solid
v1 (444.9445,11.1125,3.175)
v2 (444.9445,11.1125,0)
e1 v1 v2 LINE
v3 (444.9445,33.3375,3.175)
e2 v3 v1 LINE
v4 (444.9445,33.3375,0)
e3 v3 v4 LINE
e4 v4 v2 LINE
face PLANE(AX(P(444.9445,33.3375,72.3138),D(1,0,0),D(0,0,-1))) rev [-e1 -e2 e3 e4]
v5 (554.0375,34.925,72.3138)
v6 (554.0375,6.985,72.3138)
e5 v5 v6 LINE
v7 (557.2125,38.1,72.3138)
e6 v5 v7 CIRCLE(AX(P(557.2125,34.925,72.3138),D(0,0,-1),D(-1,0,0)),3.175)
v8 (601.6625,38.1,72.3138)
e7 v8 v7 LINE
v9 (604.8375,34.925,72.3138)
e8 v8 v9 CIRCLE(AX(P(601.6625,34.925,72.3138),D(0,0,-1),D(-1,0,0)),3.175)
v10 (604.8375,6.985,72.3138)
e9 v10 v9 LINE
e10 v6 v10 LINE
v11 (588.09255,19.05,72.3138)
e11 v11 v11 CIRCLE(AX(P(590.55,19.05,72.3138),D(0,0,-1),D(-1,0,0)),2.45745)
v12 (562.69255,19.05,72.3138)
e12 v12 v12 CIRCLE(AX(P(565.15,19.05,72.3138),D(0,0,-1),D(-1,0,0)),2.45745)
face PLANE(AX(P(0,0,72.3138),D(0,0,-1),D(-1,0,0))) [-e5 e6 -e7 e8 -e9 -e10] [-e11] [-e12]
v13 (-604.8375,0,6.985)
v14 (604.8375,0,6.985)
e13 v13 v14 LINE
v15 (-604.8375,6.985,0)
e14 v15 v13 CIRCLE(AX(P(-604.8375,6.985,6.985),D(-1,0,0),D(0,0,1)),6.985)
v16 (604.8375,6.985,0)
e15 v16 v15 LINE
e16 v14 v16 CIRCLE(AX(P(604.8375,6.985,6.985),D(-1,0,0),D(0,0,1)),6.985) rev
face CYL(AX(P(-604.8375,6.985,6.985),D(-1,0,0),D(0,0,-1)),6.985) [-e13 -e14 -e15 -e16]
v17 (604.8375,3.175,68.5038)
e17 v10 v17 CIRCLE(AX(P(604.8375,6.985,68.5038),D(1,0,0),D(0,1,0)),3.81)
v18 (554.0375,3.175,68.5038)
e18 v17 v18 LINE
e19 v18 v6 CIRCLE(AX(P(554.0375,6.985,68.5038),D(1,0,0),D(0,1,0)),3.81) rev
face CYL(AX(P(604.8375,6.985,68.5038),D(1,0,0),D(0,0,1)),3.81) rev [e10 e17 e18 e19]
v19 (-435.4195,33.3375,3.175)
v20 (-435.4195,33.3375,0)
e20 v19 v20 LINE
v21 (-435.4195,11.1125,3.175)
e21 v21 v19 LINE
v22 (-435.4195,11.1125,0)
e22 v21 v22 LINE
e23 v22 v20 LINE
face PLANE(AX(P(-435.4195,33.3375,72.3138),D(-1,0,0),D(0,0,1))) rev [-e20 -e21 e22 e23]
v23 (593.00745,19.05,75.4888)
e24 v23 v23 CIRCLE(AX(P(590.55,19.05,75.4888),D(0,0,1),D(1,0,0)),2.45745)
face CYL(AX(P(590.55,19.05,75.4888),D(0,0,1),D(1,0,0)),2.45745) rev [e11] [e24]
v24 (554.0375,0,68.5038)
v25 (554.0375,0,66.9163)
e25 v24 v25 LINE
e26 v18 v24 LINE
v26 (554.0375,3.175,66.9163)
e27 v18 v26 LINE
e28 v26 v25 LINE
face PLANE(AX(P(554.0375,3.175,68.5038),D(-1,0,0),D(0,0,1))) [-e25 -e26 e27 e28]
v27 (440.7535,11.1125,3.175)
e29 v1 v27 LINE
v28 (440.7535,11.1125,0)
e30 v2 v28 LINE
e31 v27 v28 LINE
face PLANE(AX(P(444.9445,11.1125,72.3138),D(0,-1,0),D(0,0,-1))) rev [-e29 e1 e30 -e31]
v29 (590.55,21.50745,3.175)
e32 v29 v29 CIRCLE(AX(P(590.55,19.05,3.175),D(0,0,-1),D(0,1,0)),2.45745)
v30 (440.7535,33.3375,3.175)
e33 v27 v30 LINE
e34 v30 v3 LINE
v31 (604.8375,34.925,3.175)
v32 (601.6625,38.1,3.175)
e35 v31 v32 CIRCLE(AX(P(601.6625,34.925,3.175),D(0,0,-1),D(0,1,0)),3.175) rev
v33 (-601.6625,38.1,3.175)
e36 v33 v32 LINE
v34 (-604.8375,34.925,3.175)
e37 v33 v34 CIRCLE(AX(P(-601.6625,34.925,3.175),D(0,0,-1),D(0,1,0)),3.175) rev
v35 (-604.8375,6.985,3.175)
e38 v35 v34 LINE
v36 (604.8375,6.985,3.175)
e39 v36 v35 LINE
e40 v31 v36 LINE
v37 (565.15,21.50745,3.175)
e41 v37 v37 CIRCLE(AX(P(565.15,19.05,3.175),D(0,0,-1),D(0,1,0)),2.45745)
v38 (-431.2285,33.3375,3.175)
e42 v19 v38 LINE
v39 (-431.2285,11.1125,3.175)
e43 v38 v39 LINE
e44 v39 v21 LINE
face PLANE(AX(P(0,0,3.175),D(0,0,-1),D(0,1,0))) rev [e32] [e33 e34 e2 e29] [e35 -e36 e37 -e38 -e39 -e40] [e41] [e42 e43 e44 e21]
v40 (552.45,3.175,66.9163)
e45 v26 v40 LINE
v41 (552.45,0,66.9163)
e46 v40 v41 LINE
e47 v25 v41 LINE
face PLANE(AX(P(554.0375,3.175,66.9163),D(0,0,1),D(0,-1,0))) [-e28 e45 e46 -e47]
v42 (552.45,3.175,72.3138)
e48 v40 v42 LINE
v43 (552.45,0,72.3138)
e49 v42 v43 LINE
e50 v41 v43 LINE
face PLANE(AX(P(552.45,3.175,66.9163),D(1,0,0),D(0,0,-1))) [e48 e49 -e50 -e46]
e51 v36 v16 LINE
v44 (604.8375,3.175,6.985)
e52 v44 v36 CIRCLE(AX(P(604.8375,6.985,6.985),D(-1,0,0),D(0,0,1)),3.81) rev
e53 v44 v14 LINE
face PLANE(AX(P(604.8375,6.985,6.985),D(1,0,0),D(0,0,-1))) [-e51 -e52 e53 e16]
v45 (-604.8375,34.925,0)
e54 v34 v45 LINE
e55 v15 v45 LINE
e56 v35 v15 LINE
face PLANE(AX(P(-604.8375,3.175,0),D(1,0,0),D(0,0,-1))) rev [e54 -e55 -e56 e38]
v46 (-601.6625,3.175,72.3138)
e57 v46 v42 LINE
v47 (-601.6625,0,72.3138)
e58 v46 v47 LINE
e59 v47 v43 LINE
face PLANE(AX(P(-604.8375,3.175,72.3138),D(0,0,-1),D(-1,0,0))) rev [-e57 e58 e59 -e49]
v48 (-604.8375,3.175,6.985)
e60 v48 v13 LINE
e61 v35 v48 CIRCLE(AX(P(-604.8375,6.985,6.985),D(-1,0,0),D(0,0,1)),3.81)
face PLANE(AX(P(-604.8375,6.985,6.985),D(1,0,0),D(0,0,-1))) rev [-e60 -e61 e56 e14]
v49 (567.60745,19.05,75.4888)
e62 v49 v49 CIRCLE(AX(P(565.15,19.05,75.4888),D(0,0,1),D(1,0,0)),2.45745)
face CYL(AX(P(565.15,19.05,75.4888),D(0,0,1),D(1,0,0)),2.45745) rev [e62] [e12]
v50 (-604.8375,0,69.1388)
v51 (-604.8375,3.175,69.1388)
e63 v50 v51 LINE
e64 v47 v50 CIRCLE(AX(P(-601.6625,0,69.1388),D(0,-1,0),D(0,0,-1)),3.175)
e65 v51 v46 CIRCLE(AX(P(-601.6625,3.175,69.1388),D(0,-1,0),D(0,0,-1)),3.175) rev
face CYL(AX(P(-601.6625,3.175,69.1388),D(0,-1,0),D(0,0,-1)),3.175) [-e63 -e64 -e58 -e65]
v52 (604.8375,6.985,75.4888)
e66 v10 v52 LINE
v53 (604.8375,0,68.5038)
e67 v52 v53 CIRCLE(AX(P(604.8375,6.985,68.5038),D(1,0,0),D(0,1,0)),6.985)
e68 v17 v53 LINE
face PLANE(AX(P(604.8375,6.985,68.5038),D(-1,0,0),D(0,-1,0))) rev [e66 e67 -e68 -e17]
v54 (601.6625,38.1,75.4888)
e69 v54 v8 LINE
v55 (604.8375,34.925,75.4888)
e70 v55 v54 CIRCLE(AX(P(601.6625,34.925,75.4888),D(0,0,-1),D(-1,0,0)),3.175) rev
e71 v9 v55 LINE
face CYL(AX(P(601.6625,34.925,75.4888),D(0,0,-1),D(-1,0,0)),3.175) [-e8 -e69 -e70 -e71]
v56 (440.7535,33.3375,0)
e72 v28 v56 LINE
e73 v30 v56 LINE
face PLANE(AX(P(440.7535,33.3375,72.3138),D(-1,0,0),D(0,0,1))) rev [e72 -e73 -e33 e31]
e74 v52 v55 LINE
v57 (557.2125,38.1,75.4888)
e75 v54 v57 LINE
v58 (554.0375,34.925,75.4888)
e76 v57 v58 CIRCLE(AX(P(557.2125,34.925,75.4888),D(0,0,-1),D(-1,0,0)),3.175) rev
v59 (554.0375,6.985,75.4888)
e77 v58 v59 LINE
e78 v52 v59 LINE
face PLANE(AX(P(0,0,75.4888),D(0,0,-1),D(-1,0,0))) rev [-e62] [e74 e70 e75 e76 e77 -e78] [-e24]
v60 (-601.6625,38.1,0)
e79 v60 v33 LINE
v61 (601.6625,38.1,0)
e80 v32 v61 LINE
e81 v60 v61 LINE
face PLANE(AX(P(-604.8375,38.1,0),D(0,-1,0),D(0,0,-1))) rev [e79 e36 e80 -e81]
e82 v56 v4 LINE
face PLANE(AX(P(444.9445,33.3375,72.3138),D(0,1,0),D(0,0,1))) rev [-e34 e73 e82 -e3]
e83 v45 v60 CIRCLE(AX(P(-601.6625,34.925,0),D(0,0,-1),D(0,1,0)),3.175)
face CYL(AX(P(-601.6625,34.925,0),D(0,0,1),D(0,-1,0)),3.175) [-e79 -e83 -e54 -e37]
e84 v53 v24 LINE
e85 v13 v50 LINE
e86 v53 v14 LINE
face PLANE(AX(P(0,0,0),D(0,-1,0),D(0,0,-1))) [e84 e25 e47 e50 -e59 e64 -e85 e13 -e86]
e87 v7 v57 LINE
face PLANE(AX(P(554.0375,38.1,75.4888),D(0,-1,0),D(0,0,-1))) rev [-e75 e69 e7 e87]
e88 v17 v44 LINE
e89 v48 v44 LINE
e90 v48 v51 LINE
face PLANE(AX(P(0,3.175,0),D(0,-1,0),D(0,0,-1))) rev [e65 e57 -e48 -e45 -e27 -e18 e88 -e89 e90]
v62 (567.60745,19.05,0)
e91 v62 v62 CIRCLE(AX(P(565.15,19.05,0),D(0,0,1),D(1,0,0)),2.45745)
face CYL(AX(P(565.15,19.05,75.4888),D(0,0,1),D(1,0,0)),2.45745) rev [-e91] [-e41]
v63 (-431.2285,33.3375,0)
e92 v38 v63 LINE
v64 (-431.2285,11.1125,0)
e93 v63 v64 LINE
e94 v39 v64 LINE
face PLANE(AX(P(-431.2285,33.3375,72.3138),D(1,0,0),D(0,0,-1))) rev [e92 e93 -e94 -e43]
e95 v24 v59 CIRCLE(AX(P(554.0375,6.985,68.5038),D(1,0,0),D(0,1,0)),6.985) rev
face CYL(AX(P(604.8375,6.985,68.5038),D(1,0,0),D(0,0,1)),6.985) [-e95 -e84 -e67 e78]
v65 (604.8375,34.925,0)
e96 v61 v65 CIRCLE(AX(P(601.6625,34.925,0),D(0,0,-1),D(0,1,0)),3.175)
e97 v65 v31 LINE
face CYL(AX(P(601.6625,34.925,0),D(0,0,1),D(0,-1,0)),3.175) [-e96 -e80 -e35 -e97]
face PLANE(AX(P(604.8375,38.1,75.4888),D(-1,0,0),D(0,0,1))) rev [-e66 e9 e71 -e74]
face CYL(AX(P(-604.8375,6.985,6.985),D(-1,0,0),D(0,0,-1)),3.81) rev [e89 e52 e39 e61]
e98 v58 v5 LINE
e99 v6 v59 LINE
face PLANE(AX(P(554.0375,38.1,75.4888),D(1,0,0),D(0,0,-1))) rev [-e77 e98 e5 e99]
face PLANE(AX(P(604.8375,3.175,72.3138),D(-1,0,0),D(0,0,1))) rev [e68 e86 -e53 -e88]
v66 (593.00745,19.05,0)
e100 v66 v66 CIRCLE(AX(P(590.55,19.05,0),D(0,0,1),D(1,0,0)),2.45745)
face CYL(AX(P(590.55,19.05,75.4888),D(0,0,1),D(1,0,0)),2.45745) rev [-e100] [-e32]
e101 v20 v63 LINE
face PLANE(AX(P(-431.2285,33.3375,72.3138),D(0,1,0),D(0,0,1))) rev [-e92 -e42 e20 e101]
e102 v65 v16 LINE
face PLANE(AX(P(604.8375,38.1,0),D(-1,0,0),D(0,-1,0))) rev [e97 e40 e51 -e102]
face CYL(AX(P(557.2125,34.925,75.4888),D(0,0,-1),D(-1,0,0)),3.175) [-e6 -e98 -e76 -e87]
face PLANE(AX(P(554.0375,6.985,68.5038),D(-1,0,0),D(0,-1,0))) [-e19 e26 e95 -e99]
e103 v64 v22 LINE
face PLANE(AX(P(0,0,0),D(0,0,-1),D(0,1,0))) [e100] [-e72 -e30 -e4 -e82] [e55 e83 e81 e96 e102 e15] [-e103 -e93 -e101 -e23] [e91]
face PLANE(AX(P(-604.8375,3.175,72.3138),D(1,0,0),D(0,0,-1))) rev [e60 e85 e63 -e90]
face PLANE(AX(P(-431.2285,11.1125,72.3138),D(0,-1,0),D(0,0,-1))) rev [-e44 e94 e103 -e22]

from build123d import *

# Parameters (mm, degrees)
SKETCH1_W                     = 1209.675
SKETCH1_H                     = 72.3138
BASE_FLANGE1_DEPTH            = 3.175
EDGE_FLANGE1_STRIP_W          = 20.32
EDGE_FLANGE1_STRIP_H          = 3.175
EDGE_FLANGE1_STRIP_CUT_DEPTH  = 1209.675
EDGE_FLANGE1_DEPTH            = 1209.675
SKETCH10_W                    = 4.191
SKETCH10_H                    = 22.225
CUT_EXTRUDE2_DEPTH            = 611.335397201
FILLET1_R                     = 3.175
LPATTERN1_COUNT               = 2
LPATTERN1_PITCH               = 876.173
EDGE_FLANGE2_STRIP_W          = 20.32
EDGE_FLANGE2_STRIP_H          = 3.175
EDGE_FLANGE2_STRIP_CUT_DEPTH  = 50.8
EDGE_FLANGE2_RELIEF_W         = 21.9075
EDGE_FLANGE2_RELIEF_H         = 1.5875
EDGE_FLANGE2_RELIEF_CUT_DEPTH = 3.175
EDGE_FLANGE2_DEPTH            = 50.8
FILLET2_R                     = 3.175
F_10_0_1935_DIAMETER_HOLE1_D  = 4.9149


# Sheet-metal steps are written as plain solids
with BuildPart() as part:
    # Sketch1 → Base-Flange1 (new body)
    with BuildSketch(Plane(origin=(0, 0, 0), x_dir=(1, 0, 0), z_dir=(0, 1, 0))):
        with Locations((0, -36.1569)):
            Rectangle(SKETCH1_W, SKETCH1_H)
    extrude(amount=BASE_FLANGE1_DEPTH)

    # Edge-Flange1 strip (across the edge) → Edge-Flange1 strip cut (cut)
    with BuildSketch(Plane(origin=(604.8375, 3.175, 0), x_dir=(0, 0, 1), z_dir=(-1, 0, 0))):
        with Locations((-3.175, -1.5875)):
            Rectangle(EDGE_FLANGE1_STRIP_W, EDGE_FLANGE1_STRIP_H)
    extrude(amount=EDGE_FLANGE1_STRIP_CUT_DEPTH, mode=Mode.SUBTRACT)

    # Edge-Flange1 section (across the edge) → Edge-Flange1 (add)
    with BuildSketch(Plane(origin=(604.8375, 3.175, 0), x_dir=(0, 0, 1), z_dir=(-1, 0, 0))):
        with BuildLine():
            Line((0, 3.81), (0, 34.925))
            Line((0, 34.925), (3.175, 34.925))
            Line((3.175, 34.925), (3.175, 3.81))
            ThreePointArc((3.175, 3.81), (4.290923164, 1.115923164), (6.985, 0))
            Line((6.985, 0), (6.985, -3.175))
            ThreePointArc((6.985, -3.175), (2.045859133, -1.129140867), (0, 3.81))
        make_face()
    extrude(amount=EDGE_FLANGE1_DEPTH)

    # Sketch10 → Cut-Extrude2 (cut, through all)
    with BuildSketch(Plane(origin=(0, 0, 0), x_dir=(-1, 0, 0), z_dir=(0, 0, -1))):
        with Locations((433.324, 22.225)):
            Rectangle(SKETCH10_W, SKETCH10_H)
    cut_extrude2 = extrude(amount=-CUT_EXTRUDE2_DEPTH, mode=Mode.SUBTRACT)

    # Fillet1
    fillet1_edges = [part.edges().sort_by_distance(p)[0] for p in [
        (604.8375, 38.1, 1.5875),
        (-604.8375, 38.1, 1.5875),
        (-604.8375, 1.5875, 72.3138),
    ]]
    fillet(fillet1_edges, radius=FILLET1_R)

    # LPattern1: Cut-Extrude2 ×2
    with Locations(*[(i * LPATTERN1_PITCH, 0, 0) for i in range(1, LPATTERN1_COUNT)]):
        add(cut_extrude2, mode=Mode.SUBTRACT)

    # Edge-Flange2 strip (across the edge) → Edge-Flange2 strip cut (cut)
    with BuildSketch(Plane(origin=(554.0375, 3.175, 72.3138), x_dir=(0, 0, -1), z_dir=(1, 0, 0))):
        with Locations((-6.35, -1.5875)):
            Rectangle(EDGE_FLANGE2_STRIP_W, EDGE_FLANGE2_STRIP_H)
    extrude(amount=EDGE_FLANGE2_STRIP_CUT_DEPTH, mode=Mode.SUBTRACT)

    # Edge-Flange2 relief (on the sheet) → Edge-Flange2 relief cut (cut)
    with BuildSketch(Plane(origin=(554.0375, 3.175, 68.5038), x_dir=(0, 0, -1), z_dir=(0, 1, 0))):
        with Locations((-9.36625, 0.79375)):
            Rectangle(EDGE_FLANGE2_RELIEF_W, EDGE_FLANGE2_RELIEF_H)
    extrude(amount=-EDGE_FLANGE2_RELIEF_CUT_DEPTH, mode=Mode.SUBTRACT)

    # Edge-Flange2 section (across the edge) → Edge-Flange2 (add)
    with BuildSketch(Plane(origin=(554.0375, 3.175, 72.3138), x_dir=(0, 0, -1), z_dir=(1, 0, 0))):
        with BuildLine():
            Line((-3.175, 3.81), (-3.175, 34.925))
            Line((-3.175, 34.925), (0, 34.925))
            Line((0, 34.925), (0, 3.81))
            ThreePointArc((0, 3.81), (1.115923164, 1.115923164), (3.81, 0))
            Line((3.81, 0), (3.81, -3.175))
            ThreePointArc((3.81, -3.175), (-1.129140867, -1.129140867), (-3.175, 3.81))
        make_face()
    extrude(amount=EDGE_FLANGE2_DEPTH)

    # Fillet2
    fillet2_edges = [part.edges().sort_by_distance(p)[0] for p in [
        (554.0375, 38.1, 73.9013),
        (604.8375, 38.1, 73.9013),
    ]]
    fillet(fillet2_edges, radius=FILLET2_R)

    # #10 (0.1935) Diameter Hole1 (through all)
    with Locations(Plane.XY.offset(75.4888)):
        with Locations((590.55, 19.05), (565.15, 19.05)):
            Hole(F_10_0_1935_DIAMETER_HOLE1_D / 2)


solid = part.part
